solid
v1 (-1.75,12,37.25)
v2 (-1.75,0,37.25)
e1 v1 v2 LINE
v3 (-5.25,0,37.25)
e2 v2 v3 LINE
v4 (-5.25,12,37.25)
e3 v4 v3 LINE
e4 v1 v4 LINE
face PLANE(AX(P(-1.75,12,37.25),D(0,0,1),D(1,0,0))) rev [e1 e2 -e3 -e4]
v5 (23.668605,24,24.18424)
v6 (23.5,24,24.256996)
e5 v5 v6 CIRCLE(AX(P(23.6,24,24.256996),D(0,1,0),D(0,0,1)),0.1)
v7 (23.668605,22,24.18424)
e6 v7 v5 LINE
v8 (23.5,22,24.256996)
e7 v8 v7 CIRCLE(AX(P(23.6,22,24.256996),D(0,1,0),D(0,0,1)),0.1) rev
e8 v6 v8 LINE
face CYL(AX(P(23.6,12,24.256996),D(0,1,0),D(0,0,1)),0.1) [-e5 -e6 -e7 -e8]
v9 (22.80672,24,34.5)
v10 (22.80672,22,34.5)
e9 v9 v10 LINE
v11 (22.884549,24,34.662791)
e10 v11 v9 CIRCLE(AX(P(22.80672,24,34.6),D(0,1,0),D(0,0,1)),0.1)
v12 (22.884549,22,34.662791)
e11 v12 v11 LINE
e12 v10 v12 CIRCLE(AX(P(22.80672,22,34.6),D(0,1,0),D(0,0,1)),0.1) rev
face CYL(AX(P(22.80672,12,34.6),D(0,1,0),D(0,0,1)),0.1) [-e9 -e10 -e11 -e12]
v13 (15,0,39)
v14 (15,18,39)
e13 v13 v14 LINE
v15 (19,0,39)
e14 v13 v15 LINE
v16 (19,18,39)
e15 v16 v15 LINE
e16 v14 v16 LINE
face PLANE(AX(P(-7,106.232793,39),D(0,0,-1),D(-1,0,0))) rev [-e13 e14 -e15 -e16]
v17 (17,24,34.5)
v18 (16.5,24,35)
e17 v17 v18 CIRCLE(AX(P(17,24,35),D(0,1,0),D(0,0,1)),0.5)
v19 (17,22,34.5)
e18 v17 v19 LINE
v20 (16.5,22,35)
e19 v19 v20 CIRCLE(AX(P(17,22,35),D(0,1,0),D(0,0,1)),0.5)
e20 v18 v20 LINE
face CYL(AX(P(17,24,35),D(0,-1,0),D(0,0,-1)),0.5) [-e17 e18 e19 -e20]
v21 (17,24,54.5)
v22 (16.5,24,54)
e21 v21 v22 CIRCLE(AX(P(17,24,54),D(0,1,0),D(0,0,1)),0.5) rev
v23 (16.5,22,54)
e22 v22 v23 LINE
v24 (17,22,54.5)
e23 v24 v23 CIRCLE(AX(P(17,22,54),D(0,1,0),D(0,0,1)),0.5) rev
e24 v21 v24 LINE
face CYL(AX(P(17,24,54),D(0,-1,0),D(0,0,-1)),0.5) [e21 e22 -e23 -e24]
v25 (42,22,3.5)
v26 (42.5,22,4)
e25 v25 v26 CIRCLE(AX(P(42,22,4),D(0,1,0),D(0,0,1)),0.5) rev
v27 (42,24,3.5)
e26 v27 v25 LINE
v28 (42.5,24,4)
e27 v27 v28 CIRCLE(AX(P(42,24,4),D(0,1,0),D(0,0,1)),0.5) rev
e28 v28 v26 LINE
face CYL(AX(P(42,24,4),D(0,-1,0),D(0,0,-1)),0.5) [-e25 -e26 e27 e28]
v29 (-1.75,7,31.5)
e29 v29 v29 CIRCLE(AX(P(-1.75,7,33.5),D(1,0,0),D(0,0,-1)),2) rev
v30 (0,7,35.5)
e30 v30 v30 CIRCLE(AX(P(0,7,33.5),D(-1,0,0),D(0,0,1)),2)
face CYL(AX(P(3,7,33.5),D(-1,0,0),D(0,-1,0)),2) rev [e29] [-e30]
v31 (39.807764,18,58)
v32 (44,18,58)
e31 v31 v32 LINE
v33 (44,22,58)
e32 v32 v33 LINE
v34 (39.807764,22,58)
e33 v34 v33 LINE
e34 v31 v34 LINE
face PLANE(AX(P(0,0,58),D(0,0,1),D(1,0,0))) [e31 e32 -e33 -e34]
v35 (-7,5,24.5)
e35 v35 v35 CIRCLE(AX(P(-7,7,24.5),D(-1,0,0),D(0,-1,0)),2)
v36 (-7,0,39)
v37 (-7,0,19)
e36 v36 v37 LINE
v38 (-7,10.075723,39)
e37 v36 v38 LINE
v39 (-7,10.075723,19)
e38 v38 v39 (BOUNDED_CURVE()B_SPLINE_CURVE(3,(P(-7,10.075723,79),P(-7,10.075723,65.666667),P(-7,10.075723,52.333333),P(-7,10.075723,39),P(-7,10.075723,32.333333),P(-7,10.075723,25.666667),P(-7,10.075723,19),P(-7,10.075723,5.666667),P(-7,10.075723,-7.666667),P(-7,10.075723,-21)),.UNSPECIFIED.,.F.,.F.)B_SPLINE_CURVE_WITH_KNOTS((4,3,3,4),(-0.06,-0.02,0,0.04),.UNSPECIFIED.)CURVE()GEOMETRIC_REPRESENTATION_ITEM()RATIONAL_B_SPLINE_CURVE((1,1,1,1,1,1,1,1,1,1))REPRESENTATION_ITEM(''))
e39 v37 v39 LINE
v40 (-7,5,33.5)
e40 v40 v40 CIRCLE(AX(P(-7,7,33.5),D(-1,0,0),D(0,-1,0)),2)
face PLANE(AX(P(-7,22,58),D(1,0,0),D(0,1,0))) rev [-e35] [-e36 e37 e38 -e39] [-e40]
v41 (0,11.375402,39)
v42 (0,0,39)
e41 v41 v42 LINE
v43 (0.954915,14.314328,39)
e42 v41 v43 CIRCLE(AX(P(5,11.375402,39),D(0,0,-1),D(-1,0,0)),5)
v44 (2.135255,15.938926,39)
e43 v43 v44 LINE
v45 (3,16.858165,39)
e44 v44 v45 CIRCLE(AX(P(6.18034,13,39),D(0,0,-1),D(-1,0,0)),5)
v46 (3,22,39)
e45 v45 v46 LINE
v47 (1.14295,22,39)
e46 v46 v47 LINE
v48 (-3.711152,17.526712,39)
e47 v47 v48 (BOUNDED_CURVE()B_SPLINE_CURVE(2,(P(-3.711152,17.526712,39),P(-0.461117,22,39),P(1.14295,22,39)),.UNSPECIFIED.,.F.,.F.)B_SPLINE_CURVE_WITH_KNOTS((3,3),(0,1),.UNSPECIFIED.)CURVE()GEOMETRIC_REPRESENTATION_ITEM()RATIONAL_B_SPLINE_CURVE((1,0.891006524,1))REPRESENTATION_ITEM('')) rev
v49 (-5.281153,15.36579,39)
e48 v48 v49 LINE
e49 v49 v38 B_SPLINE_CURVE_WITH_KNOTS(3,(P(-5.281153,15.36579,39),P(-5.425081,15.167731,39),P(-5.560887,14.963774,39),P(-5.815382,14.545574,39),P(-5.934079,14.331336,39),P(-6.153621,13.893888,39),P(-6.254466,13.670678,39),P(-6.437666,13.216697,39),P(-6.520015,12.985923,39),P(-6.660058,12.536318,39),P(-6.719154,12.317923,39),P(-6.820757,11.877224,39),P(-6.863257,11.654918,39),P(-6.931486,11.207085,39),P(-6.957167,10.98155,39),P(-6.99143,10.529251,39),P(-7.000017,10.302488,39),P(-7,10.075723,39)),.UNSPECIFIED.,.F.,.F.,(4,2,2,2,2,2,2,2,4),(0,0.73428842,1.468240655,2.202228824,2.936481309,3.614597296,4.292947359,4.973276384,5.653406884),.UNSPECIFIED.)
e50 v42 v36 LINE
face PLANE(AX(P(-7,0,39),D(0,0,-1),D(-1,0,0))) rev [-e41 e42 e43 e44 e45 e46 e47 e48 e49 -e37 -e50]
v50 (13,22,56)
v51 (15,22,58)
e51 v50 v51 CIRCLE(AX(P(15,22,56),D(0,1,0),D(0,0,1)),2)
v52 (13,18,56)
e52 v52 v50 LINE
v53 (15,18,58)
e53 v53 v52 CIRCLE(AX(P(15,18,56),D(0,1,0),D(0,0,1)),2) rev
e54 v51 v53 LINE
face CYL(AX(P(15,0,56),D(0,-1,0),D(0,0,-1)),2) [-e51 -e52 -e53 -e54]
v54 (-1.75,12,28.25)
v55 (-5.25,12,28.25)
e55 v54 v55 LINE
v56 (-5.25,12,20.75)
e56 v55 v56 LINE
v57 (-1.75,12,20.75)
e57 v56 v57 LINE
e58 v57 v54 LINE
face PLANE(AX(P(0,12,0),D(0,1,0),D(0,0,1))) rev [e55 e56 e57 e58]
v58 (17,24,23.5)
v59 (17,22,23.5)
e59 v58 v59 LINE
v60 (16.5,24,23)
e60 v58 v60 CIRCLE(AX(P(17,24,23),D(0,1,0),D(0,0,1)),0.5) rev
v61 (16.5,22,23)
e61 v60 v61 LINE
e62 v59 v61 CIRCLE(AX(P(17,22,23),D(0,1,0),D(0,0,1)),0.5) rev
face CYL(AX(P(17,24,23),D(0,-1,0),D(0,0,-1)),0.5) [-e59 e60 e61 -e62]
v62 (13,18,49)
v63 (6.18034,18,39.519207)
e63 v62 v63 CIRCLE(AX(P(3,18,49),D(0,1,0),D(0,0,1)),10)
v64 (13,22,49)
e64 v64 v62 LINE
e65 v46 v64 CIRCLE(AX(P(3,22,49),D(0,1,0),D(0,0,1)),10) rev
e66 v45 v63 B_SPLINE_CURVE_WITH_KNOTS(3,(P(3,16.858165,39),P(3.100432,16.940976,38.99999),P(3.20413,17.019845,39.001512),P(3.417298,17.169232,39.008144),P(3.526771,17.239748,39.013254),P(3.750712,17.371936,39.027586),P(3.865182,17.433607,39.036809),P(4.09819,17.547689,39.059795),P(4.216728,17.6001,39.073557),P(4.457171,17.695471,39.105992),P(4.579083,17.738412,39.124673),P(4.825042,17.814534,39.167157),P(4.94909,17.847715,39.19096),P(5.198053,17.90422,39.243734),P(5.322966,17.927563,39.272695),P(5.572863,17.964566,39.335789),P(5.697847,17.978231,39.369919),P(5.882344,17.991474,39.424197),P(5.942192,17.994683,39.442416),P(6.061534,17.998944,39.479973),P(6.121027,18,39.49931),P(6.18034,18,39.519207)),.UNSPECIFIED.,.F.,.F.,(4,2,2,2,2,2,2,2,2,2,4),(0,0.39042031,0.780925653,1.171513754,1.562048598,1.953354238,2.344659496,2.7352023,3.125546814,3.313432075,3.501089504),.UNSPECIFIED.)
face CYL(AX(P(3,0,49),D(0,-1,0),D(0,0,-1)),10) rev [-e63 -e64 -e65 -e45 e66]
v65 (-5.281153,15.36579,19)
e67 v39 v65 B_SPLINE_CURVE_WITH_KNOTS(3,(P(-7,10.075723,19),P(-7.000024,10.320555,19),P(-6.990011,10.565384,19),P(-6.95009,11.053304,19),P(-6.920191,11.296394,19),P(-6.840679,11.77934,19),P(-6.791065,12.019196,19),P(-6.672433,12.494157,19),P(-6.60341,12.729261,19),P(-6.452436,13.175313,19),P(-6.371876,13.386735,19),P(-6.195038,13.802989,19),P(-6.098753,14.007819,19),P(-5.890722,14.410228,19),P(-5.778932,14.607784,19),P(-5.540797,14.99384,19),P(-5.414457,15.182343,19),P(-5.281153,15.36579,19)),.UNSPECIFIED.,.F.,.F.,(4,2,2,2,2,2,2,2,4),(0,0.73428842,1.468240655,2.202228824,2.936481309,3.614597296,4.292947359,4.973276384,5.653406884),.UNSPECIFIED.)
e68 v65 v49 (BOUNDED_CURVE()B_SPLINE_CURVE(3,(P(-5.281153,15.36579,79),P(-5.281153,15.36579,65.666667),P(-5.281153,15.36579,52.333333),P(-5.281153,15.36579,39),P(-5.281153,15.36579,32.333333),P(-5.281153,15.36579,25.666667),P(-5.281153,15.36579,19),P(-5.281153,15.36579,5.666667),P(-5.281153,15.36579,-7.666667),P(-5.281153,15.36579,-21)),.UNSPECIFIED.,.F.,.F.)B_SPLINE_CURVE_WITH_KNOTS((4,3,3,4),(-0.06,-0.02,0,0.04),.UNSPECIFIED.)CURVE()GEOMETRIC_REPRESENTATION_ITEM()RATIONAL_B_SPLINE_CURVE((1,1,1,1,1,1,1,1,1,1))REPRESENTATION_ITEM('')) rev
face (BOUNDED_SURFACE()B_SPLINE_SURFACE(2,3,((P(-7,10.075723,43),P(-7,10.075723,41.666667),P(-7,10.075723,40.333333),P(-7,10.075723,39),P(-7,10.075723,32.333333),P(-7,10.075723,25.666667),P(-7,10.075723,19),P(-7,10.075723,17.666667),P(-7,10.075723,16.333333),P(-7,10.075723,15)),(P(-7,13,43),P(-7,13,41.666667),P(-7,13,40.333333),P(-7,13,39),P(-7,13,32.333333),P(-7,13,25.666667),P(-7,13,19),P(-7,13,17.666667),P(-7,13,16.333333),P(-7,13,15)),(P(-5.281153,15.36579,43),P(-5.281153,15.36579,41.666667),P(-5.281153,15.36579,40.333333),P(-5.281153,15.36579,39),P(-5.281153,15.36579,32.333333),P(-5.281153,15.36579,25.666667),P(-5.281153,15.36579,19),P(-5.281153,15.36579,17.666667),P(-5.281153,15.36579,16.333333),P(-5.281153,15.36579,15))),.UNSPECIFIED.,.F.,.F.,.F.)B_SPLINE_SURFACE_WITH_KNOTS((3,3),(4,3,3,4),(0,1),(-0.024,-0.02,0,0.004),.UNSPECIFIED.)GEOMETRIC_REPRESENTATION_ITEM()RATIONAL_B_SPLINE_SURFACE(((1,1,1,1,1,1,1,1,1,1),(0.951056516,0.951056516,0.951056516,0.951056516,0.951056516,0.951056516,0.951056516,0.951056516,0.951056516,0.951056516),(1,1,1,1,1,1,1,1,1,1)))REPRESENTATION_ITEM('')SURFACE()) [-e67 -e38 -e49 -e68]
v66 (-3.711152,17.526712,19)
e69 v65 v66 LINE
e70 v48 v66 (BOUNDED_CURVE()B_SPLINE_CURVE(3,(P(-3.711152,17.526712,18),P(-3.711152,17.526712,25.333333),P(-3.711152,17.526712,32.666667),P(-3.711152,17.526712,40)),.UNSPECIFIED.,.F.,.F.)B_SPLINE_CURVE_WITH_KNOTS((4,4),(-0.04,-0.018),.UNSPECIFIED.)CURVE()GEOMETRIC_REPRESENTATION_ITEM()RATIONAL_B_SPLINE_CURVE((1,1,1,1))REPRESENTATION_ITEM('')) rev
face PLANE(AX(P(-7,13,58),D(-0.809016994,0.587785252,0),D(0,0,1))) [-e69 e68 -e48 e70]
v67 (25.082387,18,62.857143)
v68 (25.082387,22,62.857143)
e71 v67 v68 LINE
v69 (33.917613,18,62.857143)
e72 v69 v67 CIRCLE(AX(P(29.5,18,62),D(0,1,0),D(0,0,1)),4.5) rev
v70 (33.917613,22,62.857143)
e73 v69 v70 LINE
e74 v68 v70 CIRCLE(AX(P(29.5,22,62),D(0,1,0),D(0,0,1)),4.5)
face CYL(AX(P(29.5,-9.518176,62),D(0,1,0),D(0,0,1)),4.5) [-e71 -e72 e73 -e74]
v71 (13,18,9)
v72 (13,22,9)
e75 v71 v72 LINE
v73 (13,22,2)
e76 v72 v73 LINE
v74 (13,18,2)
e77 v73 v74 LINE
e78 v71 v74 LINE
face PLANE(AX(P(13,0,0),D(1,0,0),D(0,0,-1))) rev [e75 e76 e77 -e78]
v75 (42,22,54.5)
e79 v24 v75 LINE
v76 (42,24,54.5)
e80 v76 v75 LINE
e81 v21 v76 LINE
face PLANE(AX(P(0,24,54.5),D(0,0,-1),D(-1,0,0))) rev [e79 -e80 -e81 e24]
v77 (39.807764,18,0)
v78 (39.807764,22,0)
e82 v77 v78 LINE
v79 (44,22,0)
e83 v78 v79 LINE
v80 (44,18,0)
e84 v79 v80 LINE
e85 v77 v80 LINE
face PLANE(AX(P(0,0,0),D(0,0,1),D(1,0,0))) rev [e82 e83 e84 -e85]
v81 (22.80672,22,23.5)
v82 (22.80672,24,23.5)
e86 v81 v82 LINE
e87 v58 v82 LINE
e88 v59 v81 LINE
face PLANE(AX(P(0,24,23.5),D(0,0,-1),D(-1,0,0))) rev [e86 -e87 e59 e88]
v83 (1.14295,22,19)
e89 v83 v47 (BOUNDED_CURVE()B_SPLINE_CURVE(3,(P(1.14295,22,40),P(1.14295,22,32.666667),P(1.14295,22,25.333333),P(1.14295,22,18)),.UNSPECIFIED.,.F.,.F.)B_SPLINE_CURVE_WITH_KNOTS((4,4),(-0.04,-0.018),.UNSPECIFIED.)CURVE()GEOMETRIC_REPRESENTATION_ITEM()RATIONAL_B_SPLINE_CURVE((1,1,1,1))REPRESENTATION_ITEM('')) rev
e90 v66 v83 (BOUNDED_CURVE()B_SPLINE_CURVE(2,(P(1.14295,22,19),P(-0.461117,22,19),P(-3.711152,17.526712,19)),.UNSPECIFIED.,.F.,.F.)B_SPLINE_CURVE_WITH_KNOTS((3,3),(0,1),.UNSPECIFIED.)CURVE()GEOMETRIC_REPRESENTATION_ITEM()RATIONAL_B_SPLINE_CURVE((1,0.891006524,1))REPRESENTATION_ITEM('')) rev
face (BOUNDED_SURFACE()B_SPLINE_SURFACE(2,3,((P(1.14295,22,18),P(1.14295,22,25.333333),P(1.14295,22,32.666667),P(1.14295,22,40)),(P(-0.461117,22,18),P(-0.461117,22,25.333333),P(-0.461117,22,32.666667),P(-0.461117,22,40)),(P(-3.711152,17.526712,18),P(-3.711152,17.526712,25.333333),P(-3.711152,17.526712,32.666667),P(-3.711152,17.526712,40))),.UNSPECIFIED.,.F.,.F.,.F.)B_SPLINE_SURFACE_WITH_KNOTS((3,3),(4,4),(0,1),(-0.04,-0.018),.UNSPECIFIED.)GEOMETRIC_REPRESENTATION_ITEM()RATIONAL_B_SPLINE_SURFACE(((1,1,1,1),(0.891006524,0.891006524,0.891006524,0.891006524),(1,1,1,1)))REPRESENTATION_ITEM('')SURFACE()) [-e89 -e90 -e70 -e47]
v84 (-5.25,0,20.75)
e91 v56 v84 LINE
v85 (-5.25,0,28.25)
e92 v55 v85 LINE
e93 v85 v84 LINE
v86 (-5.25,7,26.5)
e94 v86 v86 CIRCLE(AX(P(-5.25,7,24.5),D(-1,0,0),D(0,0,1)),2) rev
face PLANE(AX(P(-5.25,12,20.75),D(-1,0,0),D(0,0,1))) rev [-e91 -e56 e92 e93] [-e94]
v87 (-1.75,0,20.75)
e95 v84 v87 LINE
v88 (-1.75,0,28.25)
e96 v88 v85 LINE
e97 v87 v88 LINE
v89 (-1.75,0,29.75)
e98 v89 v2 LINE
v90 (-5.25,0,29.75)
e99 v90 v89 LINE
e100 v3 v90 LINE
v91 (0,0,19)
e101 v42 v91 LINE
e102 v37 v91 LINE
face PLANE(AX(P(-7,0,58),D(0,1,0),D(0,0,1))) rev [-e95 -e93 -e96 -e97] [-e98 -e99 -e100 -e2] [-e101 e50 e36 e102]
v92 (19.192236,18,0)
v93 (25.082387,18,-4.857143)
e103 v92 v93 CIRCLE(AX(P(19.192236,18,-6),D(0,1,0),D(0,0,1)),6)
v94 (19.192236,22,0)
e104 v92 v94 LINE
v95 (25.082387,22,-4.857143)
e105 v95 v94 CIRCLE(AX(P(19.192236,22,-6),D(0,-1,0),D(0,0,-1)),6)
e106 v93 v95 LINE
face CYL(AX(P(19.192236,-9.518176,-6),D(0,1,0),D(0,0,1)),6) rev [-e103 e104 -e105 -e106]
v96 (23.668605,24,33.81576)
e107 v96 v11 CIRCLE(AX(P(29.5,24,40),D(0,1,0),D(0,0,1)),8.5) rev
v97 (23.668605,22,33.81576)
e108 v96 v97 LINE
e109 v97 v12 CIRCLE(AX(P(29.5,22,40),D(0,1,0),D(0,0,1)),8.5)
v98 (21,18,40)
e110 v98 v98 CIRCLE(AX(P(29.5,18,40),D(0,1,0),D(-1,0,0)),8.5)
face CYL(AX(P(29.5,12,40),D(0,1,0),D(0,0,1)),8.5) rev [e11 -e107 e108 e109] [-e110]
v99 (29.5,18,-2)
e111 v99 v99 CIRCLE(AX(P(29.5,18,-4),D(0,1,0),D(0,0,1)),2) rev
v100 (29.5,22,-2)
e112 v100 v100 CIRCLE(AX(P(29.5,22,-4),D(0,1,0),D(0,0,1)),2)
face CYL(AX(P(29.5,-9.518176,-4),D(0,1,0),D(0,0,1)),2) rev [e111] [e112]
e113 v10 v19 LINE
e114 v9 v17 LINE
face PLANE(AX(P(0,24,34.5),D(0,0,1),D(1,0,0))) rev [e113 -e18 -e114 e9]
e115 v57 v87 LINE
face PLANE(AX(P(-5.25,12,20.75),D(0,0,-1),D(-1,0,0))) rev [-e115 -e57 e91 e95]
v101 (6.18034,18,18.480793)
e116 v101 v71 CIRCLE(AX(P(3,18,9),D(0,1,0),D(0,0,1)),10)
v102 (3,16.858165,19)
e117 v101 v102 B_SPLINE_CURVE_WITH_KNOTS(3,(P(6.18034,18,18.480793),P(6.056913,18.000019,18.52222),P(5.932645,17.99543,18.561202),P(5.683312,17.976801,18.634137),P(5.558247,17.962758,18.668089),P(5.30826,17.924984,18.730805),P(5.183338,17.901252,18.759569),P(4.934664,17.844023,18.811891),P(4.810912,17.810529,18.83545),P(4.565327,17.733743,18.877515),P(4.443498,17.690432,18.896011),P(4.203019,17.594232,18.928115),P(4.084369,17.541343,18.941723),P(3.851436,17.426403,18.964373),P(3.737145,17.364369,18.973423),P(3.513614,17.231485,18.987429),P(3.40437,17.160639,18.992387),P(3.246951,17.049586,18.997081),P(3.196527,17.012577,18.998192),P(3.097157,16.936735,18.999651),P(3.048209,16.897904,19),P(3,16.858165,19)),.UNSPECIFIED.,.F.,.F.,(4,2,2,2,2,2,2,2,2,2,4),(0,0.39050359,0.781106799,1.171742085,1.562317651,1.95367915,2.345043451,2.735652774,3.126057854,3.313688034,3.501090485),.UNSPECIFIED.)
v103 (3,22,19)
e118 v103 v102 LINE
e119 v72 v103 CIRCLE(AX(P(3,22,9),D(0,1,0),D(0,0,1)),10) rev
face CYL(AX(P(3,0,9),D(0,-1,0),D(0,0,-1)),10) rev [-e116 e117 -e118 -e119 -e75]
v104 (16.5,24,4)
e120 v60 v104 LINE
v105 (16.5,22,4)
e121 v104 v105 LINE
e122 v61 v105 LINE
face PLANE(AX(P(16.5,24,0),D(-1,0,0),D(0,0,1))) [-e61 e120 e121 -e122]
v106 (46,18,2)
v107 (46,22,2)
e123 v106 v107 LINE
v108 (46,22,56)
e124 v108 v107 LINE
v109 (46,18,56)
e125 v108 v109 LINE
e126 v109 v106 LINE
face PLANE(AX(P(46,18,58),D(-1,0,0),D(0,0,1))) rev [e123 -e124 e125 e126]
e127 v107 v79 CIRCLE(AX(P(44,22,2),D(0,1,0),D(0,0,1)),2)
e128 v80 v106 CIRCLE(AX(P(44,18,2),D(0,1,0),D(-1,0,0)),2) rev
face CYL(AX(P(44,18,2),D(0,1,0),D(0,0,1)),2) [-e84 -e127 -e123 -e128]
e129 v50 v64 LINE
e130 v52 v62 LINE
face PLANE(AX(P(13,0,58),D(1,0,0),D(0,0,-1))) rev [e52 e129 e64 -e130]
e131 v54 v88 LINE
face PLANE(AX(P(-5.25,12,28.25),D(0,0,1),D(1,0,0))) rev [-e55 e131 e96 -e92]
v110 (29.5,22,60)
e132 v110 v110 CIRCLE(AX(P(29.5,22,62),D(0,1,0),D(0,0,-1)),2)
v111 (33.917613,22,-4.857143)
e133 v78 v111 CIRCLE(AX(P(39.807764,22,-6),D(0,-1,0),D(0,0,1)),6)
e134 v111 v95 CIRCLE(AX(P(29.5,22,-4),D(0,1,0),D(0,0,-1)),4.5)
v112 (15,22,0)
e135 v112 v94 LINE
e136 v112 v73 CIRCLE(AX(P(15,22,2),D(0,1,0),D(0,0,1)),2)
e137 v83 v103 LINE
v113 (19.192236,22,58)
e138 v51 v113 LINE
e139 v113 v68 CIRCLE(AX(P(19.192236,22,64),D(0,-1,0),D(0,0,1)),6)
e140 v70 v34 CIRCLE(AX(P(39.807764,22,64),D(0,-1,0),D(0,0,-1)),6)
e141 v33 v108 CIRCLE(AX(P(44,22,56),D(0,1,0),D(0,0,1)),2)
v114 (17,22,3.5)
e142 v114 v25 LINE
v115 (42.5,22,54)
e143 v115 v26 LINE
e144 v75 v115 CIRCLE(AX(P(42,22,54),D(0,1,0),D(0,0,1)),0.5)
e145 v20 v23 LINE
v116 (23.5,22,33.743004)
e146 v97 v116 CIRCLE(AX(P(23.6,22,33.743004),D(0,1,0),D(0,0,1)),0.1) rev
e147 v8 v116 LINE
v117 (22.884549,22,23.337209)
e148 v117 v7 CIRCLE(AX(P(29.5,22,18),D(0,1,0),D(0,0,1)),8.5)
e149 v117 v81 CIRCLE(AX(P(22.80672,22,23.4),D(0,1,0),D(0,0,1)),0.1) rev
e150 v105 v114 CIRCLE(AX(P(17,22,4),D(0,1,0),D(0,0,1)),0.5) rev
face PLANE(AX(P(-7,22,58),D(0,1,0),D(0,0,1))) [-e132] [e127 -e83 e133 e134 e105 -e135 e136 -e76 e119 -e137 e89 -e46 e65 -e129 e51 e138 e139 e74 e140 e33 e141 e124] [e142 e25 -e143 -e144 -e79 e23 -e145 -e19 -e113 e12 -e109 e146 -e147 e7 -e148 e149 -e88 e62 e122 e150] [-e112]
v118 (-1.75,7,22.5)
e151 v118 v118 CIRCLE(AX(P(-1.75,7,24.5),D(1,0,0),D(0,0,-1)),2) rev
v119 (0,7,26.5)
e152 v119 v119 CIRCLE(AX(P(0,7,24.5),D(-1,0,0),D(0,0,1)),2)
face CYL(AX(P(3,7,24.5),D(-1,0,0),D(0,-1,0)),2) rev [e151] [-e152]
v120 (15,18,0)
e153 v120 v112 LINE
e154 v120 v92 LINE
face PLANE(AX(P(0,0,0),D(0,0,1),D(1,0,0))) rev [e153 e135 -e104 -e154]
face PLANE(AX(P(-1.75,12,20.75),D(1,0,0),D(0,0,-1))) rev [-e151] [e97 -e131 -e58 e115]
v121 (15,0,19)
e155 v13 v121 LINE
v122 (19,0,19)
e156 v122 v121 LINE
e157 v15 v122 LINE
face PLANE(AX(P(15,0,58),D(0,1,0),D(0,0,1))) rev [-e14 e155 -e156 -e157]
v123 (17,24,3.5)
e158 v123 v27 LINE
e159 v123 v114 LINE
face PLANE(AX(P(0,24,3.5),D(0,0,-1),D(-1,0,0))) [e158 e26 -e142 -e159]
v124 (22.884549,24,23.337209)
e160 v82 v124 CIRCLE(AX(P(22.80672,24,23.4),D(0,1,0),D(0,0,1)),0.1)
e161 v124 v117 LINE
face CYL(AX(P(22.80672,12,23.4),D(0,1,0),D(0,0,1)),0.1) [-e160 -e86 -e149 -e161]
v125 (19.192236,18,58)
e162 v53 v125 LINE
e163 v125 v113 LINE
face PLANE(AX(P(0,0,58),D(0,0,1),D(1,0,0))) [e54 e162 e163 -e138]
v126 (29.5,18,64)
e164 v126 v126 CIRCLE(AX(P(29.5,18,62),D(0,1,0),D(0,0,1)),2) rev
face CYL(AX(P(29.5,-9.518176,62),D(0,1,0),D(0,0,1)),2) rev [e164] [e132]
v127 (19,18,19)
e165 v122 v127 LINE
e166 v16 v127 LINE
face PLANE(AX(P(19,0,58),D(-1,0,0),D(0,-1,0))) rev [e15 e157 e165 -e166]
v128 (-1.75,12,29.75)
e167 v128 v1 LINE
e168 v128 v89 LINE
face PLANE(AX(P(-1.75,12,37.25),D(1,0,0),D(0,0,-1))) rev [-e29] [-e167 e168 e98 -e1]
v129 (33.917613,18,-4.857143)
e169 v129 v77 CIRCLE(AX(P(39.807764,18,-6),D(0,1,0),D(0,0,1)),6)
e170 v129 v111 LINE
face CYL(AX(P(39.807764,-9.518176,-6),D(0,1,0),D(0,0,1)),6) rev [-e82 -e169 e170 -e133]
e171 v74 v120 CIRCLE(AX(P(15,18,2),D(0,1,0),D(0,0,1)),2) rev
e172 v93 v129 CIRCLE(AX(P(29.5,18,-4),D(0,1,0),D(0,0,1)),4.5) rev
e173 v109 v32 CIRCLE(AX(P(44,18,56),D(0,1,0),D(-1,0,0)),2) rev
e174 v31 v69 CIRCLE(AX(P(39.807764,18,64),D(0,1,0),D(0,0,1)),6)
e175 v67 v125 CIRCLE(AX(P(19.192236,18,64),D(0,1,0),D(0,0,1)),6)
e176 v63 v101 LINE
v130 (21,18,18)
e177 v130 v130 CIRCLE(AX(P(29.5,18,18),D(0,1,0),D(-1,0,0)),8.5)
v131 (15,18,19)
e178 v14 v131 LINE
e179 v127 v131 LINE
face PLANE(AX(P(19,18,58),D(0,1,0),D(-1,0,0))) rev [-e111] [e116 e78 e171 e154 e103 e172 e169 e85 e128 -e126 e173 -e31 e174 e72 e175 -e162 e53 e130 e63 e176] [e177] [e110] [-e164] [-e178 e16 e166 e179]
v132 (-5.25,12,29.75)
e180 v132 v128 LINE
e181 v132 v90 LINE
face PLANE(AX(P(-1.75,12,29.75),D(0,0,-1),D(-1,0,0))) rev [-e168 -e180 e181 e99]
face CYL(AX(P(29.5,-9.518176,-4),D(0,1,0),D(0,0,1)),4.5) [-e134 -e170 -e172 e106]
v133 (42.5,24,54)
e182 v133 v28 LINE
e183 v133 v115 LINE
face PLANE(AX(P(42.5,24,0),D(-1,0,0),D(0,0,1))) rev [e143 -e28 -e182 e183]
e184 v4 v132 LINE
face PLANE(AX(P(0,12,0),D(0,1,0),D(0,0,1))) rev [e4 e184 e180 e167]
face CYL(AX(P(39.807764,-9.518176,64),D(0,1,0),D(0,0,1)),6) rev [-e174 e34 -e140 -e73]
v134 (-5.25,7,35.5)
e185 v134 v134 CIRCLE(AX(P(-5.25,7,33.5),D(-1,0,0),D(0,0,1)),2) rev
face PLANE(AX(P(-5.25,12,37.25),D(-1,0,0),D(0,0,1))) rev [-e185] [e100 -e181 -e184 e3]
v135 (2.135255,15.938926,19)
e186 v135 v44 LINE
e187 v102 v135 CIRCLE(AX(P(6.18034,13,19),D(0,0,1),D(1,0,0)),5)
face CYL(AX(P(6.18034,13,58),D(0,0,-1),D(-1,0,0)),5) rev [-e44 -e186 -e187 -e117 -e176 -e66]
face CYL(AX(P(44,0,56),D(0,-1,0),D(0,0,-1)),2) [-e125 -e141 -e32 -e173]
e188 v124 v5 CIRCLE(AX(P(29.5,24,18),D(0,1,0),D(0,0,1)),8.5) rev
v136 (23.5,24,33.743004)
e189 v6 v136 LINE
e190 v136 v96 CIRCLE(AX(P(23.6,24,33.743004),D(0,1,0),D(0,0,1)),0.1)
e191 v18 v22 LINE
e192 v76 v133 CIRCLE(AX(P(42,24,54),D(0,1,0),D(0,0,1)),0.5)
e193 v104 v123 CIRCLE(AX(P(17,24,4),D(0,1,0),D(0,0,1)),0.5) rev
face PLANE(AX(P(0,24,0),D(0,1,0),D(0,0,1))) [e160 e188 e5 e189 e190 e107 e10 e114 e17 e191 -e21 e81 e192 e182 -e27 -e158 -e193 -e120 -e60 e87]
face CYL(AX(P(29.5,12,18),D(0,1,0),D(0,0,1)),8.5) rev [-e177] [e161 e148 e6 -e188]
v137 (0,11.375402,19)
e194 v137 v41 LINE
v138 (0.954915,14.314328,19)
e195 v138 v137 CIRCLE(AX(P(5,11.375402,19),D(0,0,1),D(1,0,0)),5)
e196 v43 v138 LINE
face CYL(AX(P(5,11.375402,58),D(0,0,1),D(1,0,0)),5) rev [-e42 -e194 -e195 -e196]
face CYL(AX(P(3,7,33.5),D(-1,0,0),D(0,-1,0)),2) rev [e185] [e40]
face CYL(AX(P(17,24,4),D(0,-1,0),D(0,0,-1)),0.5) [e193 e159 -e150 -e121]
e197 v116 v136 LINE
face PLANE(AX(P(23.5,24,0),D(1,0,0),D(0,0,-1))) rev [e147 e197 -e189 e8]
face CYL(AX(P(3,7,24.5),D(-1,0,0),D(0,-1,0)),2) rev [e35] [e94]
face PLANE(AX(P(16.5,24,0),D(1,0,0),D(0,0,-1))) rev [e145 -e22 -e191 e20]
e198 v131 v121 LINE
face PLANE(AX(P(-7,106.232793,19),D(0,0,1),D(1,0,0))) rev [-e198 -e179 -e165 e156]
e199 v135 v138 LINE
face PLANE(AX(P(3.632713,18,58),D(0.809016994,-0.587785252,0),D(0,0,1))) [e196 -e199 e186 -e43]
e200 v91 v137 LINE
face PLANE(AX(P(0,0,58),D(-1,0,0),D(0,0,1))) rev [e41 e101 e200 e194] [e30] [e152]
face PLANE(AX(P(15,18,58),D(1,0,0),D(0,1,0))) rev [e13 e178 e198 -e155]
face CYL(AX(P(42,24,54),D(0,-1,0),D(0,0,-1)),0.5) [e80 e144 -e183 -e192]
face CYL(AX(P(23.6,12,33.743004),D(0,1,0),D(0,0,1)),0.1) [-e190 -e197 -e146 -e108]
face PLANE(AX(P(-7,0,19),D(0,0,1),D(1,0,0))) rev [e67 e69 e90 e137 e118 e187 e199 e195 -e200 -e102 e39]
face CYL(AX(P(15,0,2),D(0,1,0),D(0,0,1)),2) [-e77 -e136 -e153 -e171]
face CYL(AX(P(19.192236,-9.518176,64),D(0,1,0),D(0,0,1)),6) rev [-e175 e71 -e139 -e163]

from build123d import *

# Parameters (mm, degrees)
BOSS_EXTRU_1_DEPTH      = 58
ESQUISSE16_R            = 2
BOSS_EXTRU_2_DEPTH      = 4
ESQUISSE9_R             = 2
ENL_V_MAT_EXTRU_5_DEPTH = 10
ESQUISSE14_W            = 20
ESQUISSE14_H            = 19
ENL_V_MAT_EXTRU_7_DEPTH = 84.798866341
ESQUISSE5_W             = 3.5
ESQUISSE5_H             = 7.5
ENL_V_MAT_EXTRU_3_DEPTH = 12
CONG_6_R                = 2
CONG_11_R               = 10
ESQUISSE15_W            = 72.69818271
ESQUISSE15_H            = 50
ENL_V_MAT_EXTRU_8_DEPTH = 18
ESQUISSE17_R            = 8.5
ENL_V_MAT_EXTRU_9_DEPTH = 10
CHANFREIN1_SIZE         = 9
CHANFREIN1_SIZE2        = 6.538882752
CHANFREIN2_SIZE         = 5
CHANFREIN2_SIZE2        = 3.63271264
CONG_14_R               = 5
CONG_16_START           = 18
CONG_16_DEPTH           = 22
BOSS_EXTRU_3_START      = 2
BOSS_EXTRU_3_DEPTH      = 2
CONG_17_START           = 22
CONG_17_DEPTH           = 3


with BuildPart() as part:
    # Esquisse1 → Boss.-Extru.1 (new body)
    with BuildSketch(Plane.XY):
        Polygon((0, 0), (0, 18), (15, 18), (15, 0), (19, 0), (19, 18), (46, 18), (46, 22), (-7, 22), (-7, 0), align=None)
    extrude(amount=BOSS_EXTRU_1_DEPTH)

    # Esquisse16 → Boss.-Extru.2 (add)
    # profile 1 of 2: a face of its own
    with BuildSketch(Plane(origin=(0, 22, 0), x_dir=(1, 0, 0), z_dir=(0, 1, 0))):
        with BuildLine():
            Line((17, -3), (42, -3))
            Line((42, -3), (42, 0))
            Line((42, 0), (39.807764064, 0))
            ThreePointArc((39.807764064, 0), (35.990510002, 1.370899501), (33.91761317, 4.857142857))
            ThreePointArc((33.91761317, 4.857142857), (29.5, 8.5), (25.08238683, 4.857142857))
            ThreePointArc((25.08238683, 4.857142857), (23.009489998, 1.370899501), (19.192235936, 0))
            Line((19.192235936, 0), (17, 0))
            Line((17, 0), (17, -3))
        make_face()
        with Locations(Location((29.5, 4, 0), (0, 0, 270))):
            Circle(ESQUISSE16_R, mode=Mode.SUBTRACT)
    # profile 2 of 2: a face of its own
    with BuildSketch(Plane(origin=(0, 22, 0), x_dir=(1, 0, 0), z_dir=(0, 1, 0))):
        with BuildLine():
            Line((17, -58), (17, -55))
            Line((17, -55), (42, -55))
            Line((42, -55), (42, -58))
            Line((42, -58), (39.807764064, -58))
            ThreePointArc((39.807764064, -58), (35.990510002, -59.370899501), (33.91761317, -62.857142857))
            ThreePointArc((33.91761317, -62.857142857), (29.5, -66.5), (25.08238683, -62.857142857))
            ThreePointArc((25.08238683, -62.857142857), (23.009489998, -59.370899501), (19.192235936, -58))
            Line((19.192235936, -58), (17, -58))
        make_face()
        with Locations(Location((29.5, -62, 0), (0, 0, 270))):
            Circle(ESQUISSE16_R, mode=Mode.SUBTRACT)
    extrude(amount=-BOSS_EXTRU_2_DEPTH)

    # Esquisse9 → Enlèv. mat.-Extru.5 (cut)
    with BuildSketch(Plane.ZY.offset(7)):
        with Locations(Location((33.5, 7, 0), (0, 0, 270))):
            Circle(ESQUISSE9_R)
        with Locations(Location((24.5, 7, 0), (0, 0, 270))):
            Circle(ESQUISSE9_R)
    extrude(amount=-ENL_V_MAT_EXTRU_5_DEPTH, mode=Mode.SUBTRACT)

    # Esquisse14 → Enlèv. mat.-Extru.7 (cut, through all)
    with BuildSketch(Plane(origin=(0, 22, 0), x_dir=(1, 0, 0), z_dir=(0, 1, 0))):
        with Locations((3, -9.5)):
            Rectangle(ESQUISSE14_W, ESQUISSE14_H)
        with Locations((3, -48.5)):
            Rectangle(ESQUISSE14_W, ESQUISSE14_H)
    extrude(amount=-ENL_V_MAT_EXTRU_7_DEPTH, mode=Mode.SUBTRACT)

    # Esquisse5 → Enlèv. mat.-Extru.3 (cut)
    with BuildSketch(Plane.XZ):
        with Locations((-3.5, 33.5)):
            Rectangle(ESQUISSE5_W, ESQUISSE5_H)
        with Locations((-3.5, 24.5)):
            Rectangle(ESQUISSE5_W, ESQUISSE5_H)
    extrude(amount=-ENL_V_MAT_EXTRU_3_DEPTH, mode=Mode.SUBTRACT)

    # Congé6
    cong_6_edges = [part.edges().sort_by_distance(p)[0] for p in [
        (46, 20, 0),
        (46, 20, 58),
        (13, 20, 0),
        (13, 20, 58),
    ]]
    fillet(cong_6_edges, radius=CONG_6_R)

    # Congé11
    cong_11_edges = [part.edges().sort_by_distance(p)[0] for p in [
        (13, 20, 19),
        (13, 20, 39),
    ]]
    fillet(cong_11_edges, radius=CONG_11_R)

    # Esquisse15 → Enlèv. mat.-Extru.8 (cut)
    with BuildSketch(Plane.XZ):
        with Locations((29.349091355, -6)):
            Rectangle(ESQUISSE15_W, ESQUISSE15_H)
        with Locations((29.349091355, 64)):
            Rectangle(ESQUISSE15_W, ESQUISSE15_H)
    extrude(amount=-ENL_V_MAT_EXTRU_8_DEPTH, mode=Mode.SUBTRACT)

    # Esquisse17 → Enlèv. mat.-Extru.9 (cut)
    with BuildSketch(Plane(origin=(0, 22, 0), x_dir=(1, 0, 0), z_dir=(0, 1, 0))):
        with Locations(Location((29.5, -18, 0), (0, 0, 270))):
            Circle(ESQUISSE17_R)
        with Locations(Location((29.5, -40, 0), (0, 0, 270))):
            Circle(ESQUISSE17_R)
    extrude(amount=-ENL_V_MAT_EXTRU_9_DEPTH, mode=Mode.SUBTRACT)

    # Chanfrein1
    chanfrein1_edges = [part.edges().sort_by_distance(p)[0] for p in [
        (-7, 22, 29),
    ]]
    chanfrein1_side = [part.faces().sort_by_distance(p)[0] for p in [
        (-7, 11.242320797, 29),
    ]]
    chamfer(chanfrein1_edges, length=CHANFREIN1_SIZE, length2=CHANFREIN1_SIZE2, reference=chanfrein1_side[0])

    # Chanfrein2
    chanfrein2_edges = [part.edges().sort_by_distance(p)[0] for p in [
        (0, 18, 29),
    ]]
    chanfrein2_side = [part.faces().sort_by_distance(p)[0] for p in [
        (0, 9.150105695, 29),
    ]]
    chamfer(chanfrein2_edges, length=CHANFREIN2_SIZE, length2=CHANFREIN2_SIZE2, reference=chanfrein2_side[0])

    # Congé14
    cong_14_edges = [part.edges().sort_by_distance(p)[0] for p in [
        (3.63271264, 18, 29),
        (0, 13, 29),
    ]]
    fillet(cong_14_edges, radius=CONG_14_R)

    # Congé15
    # a fillet whose section is not a circle: 8, 6 mm, written as the material it takes off along each edge
    with BuildSketch(Plane(origin=(-0.461117248, 22, 5.17677837), x_dir=(1, 0, 0), z_dir=(0, 0, 1))) as cong_15_piece_1:
        with BuildLine():
            Bezier((1.604067641, 0), (0, 0), (-3.250034325, -4.473288486), weights=[1, 0.891006524, 1])
            Line((-3.250034325, -4.473288486), (0, 0))
            Line((0, 0), (1.604067641, 0))
        make_face()
    extrude(amount=47.64644326, mode=Mode.SUBTRACT)

    # Congé16: read off the stored shape, not the designer's step
    # Congé16 outline → Congé16 (cut)
    with BuildSketch(Plane.XY.offset(CONG_16_START)):
        with BuildLine():
            Line((-7, 13), (-7, 10.075722734))
            add(Edge.make_bspline(
                [(-7, 10.075722734), (-7, 13), (-5.281152949, 15.365790005)],
                knots=[0, 0, 0, 1, 1, 1], degree=2, weights=[1, 0.951056516, 1]))
            Line((-5.281152949, 15.365790005), (-7, 13))
        make_face()
    extrude(amount=CONG_16_DEPTH, mode=Mode.SUBTRACT)

    # Esquisse19 → Boss.-Extru.3 (add)
    with BuildSketch(Plane(origin=(0, 22, 0), x_dir=(1, 0, 0), z_dir=(0, 1, 0)).offset(BOSS_EXTRU_3_START)):
        with BuildLine():
            ThreePointArc((38, -18), (32.759601203, -25.850159234), (23.5, -24.020797289))
            Line((23.5, -24.020797289), (23.5, -33.979202711))
            ThreePointArc((23.5, -33.979202711), (32.759601203, -32.149840766), (38, -40))
            ThreePointArc((38, -40), (26.570520177, -47.979232292), (23.019259302, -34.5))
            Line((23.019259302, -34.5), (17, -34.5))
            ThreePointArc((17, -34.5), (16.646446609, -34.646446609), (16.5, -35))
            Line((16.5, -35), (16.5, -54))
            ThreePointArc((16.5, -54), (16.646446609, -54.353553391), (17, -54.5))
            Line((17, -54.5), (42, -54.5))
            ThreePointArc((42, -54.5), (42.353553391, -54.353553391), (42.5, -54))
            Line((42.5, -54), (42.5, -4))
            ThreePointArc((42.5, -4), (42.353553391, -3.646446609), (42, -3.5))
            Line((42, -3.5), (17, -3.5))
            ThreePointArc((17, -3.5), (16.646446609, -3.646446609), (16.5, -4))
            Line((16.5, -4), (16.5, -23))
            ThreePointArc((16.5, -23), (16.646446609, -23.353553391), (17, -23.5))
            Line((17, -23.5), (23.019259302, -23.5))
            ThreePointArc((23.019259302, -23.5), (26.570520177, -10.020767708), (38, -18))
        make_face()
    extrude(amount=-BOSS_EXTRU_3_DEPTH)

    # Congé17: read off the stored shape, not the designer's step
    # Congé17 outline → Congé17 (cut)
    with BuildSketch(Plane(origin=(0, 0, 0), x_dir=(1, 0, 0), z_dir=(0, 1, 0)).offset(CONG_17_START)):
        with BuildLine():
            ThreePointArc((23.668604651, -33.815759684), (23.560379709, -33.834820214), (23.5, -33.743003916))
            Line((23.5, -33.743003916), (23.5, -33.979202711))
            ThreePointArc((23.5, -33.979202711), (23.583737888, -33.896898934), (23.668604651, -33.815759684))
        make_face()
        with BuildLine():
            ThreePointArc((22.884548627, -23.337209302), (22.896939159, -23.443133109), (22.806719788, -23.5))
            Line((22.806719788, -23.5), (23.019259302, -23.5))
            ThreePointArc((23.019259302, -23.5), (22.951398096, -23.419023261), (22.884548627, -23.337209302))
        make_face()
        with BuildLine():
            ThreePointArc((23.668604651, -24.184240316), (23.583737888, -24.103101066), (23.5, -24.020797289))
            Line((23.5, -24.020797289), (23.5, -24.256996084))
            ThreePointArc((23.5, -24.256996084), (23.560379709, -24.165179786), (23.668604651, -24.184240316))
        make_face()
        with BuildLine():
            ThreePointArc((22.884548627, -34.662790698), (22.951398096, -34.580976739), (23.019259302, -34.5))
            Line((23.019259302, -34.5), (22.806719788, -34.5))
            ThreePointArc((22.806719788, -34.5), (22.896939159, -34.556866891), (22.884548627, -34.662790698))
        make_face()
    extrude(amount=CONG_17_DEPTH, mode=Mode.SUBTRACT)


solid = part.part
